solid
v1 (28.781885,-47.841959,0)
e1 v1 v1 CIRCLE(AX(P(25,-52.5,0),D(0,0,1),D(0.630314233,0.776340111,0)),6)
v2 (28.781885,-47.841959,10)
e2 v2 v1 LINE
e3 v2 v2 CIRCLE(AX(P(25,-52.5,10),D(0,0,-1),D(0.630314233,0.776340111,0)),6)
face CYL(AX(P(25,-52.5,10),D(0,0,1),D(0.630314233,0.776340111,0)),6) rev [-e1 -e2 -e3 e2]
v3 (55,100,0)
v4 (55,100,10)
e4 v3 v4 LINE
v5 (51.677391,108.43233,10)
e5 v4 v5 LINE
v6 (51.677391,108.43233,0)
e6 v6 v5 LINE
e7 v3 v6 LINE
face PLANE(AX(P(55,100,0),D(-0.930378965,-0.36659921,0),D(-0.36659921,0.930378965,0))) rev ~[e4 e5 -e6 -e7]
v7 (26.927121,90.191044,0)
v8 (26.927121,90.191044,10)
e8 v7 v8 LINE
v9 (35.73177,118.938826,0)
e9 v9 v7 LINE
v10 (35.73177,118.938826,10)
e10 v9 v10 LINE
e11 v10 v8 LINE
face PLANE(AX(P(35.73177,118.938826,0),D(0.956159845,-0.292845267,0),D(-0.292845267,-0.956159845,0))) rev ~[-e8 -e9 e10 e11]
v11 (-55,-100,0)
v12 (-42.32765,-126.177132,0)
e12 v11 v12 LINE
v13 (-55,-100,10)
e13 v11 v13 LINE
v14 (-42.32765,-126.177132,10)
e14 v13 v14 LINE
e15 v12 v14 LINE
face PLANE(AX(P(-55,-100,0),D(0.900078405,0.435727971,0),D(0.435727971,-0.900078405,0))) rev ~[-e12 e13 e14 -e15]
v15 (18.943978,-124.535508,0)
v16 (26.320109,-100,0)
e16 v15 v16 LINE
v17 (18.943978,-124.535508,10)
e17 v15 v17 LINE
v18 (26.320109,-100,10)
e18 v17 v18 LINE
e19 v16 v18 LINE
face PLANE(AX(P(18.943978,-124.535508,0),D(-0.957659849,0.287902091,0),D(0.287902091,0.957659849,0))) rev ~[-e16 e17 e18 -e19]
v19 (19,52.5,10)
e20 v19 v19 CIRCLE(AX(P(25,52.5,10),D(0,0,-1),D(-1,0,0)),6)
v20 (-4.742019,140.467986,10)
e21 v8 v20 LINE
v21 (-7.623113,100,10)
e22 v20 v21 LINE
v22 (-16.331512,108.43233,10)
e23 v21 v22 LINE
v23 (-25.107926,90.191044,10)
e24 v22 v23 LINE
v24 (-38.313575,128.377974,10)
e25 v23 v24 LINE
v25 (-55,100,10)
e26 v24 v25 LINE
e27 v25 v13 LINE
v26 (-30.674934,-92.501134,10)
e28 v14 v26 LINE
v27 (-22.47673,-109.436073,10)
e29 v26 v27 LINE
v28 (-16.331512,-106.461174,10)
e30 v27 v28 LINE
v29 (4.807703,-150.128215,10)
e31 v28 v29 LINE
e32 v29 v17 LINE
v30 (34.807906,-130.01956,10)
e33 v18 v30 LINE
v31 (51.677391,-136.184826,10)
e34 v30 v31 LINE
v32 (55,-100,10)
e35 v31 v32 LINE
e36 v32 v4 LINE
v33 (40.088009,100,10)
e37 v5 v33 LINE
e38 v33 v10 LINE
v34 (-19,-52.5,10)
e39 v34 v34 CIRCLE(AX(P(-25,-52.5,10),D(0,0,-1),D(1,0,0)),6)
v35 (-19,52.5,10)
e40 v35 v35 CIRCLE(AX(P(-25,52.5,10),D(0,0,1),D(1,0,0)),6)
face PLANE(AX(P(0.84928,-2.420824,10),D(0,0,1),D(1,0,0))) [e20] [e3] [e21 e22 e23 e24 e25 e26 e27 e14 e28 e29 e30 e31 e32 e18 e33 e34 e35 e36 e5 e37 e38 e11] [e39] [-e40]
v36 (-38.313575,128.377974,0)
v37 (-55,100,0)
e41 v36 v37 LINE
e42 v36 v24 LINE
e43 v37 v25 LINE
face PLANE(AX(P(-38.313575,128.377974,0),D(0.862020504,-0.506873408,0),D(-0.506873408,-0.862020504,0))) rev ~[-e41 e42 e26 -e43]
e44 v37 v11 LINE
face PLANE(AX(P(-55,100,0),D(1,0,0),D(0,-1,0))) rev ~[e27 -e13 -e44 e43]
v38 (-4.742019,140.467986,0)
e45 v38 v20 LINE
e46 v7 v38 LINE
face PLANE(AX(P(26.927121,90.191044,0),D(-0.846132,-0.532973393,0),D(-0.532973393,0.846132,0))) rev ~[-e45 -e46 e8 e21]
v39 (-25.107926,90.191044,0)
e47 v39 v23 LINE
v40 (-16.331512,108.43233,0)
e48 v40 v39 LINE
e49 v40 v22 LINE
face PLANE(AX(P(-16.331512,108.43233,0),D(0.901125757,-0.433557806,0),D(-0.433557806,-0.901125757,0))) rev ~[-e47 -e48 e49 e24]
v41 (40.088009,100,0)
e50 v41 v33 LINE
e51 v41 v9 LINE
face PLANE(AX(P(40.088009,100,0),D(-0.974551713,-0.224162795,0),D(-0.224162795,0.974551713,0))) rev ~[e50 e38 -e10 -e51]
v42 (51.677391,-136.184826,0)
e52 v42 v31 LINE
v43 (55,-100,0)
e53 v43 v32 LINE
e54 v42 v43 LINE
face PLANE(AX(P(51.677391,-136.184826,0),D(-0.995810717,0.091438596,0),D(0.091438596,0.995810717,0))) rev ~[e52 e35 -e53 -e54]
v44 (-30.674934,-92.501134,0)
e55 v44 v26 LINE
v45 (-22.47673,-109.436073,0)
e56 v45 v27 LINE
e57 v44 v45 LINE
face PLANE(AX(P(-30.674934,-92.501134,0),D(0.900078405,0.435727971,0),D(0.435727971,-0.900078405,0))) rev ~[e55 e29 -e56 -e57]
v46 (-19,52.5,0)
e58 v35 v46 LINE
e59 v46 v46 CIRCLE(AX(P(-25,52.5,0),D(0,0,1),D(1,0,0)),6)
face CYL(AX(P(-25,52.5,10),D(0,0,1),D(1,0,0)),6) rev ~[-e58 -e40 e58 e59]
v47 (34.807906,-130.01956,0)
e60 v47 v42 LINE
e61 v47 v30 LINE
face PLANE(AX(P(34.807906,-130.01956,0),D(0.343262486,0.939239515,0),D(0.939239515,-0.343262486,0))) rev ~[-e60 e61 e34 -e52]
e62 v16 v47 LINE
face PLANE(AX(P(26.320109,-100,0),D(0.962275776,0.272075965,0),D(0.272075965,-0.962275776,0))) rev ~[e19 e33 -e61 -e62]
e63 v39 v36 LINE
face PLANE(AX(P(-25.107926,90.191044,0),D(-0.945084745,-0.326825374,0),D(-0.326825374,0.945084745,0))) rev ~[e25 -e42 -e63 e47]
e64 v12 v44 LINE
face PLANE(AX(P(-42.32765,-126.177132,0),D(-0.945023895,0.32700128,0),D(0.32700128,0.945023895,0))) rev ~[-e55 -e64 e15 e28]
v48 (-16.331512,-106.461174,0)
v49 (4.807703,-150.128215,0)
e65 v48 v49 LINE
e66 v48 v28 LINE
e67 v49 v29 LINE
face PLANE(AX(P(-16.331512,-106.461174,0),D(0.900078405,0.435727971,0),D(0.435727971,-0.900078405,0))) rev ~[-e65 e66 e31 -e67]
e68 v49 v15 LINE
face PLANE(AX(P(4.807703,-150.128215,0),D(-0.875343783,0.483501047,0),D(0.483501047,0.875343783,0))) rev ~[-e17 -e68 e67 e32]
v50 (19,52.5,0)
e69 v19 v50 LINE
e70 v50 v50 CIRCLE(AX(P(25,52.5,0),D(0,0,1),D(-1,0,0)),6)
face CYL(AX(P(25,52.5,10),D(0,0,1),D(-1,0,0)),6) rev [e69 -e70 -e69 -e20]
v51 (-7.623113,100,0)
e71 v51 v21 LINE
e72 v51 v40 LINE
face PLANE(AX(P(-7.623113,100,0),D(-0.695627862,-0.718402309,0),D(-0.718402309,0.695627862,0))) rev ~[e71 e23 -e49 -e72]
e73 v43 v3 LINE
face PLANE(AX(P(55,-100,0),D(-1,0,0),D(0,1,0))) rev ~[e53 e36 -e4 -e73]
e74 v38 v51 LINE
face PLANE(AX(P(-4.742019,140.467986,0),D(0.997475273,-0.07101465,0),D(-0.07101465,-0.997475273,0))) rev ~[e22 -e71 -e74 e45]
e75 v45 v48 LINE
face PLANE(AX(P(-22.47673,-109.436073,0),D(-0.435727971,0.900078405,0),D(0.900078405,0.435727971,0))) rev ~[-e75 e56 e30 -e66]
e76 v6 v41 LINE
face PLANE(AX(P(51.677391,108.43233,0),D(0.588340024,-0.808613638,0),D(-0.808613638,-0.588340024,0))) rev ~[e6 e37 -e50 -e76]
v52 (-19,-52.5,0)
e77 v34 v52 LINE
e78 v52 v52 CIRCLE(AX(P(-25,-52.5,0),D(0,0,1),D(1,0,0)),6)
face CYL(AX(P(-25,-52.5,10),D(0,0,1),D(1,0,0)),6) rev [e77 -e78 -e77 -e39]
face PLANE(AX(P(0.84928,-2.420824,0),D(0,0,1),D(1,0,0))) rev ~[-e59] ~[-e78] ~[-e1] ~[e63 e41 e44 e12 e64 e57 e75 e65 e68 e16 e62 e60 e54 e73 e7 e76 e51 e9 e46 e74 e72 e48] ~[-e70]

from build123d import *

# Parameters (mm, degrees)
F1_DEPTH = 10
F2_R     = 6
F3_DEPTH = 10.001


# Not quite as in the source:
# - a pattern or mirror of a feature is missing from the dataset's text; its kind, count and spacing are read off the source's solid


with BuildPart() as f1:
    # F0 (on Top) → F1 (new body)
    with BuildSketch(Plane.XY):
        Polygon((-55, 100), (-55, -100), (-42.3276498914, -126.1771321297), (-30.6749343872, -92.5011336803), (-22.4767297883, -109.4360733855), (-16.331512481, -106.4611735826), (4.8077032396, -150.1282154724), (18.9439784735, -124.5355084538), (26.3201091439, -100), (34.8079055548, -130.0195604563), (51.677390933, -136.1848264933), (55, -100), (55, 100), (51.677390933, 108.4323301911), (40.0880090892, 100), (35.7317700982, 118.9388260245), (26.9271209836, 90.1910439134), (-4.7420188785, 140.4679864645), (-7.6231127605, 100), (-16.331512481, 108.4323301911), (-25.1079257578, 90.1910439134), (-38.313575089, 128.3779740334), align=None)
    extrude(amount=F1_DEPTH)

    # F2 (on face) → F3 (cut, through all)
    with BuildSketch(Plane.XY.offset(10)):
        with Locations((-25, 52.5)):
            Circle(F2_R)
    f3 = extrude(amount=-F3_DEPTH, mode=Mode.SUBTRACT)

    # F3_copies: F3 across plane
    add(f3.mirror(Plane(origin=(0, 0, 0), x_dir=(0, 0, -1), z_dir=(0, -1, 0))), mode=Mode.SUBTRACT)

    # F3_copies1: F3 across plane
    add(f3.mirror(Plane(origin=(0, 0, 0), x_dir=(0, 0, 1), z_dir=(1, 0, 0))), mode=Mode.SUBTRACT)

    # F3_copies2: F3 across plane
    add(f3.mirror(Plane(origin=(0, 0, 0), x_dir=(-0.9028605188, -0.4299335804, 0), z_dir=(0.4299335804, -0.9028605188, 0))), mode=Mode.SUBTRACT)


solid = f1.part
